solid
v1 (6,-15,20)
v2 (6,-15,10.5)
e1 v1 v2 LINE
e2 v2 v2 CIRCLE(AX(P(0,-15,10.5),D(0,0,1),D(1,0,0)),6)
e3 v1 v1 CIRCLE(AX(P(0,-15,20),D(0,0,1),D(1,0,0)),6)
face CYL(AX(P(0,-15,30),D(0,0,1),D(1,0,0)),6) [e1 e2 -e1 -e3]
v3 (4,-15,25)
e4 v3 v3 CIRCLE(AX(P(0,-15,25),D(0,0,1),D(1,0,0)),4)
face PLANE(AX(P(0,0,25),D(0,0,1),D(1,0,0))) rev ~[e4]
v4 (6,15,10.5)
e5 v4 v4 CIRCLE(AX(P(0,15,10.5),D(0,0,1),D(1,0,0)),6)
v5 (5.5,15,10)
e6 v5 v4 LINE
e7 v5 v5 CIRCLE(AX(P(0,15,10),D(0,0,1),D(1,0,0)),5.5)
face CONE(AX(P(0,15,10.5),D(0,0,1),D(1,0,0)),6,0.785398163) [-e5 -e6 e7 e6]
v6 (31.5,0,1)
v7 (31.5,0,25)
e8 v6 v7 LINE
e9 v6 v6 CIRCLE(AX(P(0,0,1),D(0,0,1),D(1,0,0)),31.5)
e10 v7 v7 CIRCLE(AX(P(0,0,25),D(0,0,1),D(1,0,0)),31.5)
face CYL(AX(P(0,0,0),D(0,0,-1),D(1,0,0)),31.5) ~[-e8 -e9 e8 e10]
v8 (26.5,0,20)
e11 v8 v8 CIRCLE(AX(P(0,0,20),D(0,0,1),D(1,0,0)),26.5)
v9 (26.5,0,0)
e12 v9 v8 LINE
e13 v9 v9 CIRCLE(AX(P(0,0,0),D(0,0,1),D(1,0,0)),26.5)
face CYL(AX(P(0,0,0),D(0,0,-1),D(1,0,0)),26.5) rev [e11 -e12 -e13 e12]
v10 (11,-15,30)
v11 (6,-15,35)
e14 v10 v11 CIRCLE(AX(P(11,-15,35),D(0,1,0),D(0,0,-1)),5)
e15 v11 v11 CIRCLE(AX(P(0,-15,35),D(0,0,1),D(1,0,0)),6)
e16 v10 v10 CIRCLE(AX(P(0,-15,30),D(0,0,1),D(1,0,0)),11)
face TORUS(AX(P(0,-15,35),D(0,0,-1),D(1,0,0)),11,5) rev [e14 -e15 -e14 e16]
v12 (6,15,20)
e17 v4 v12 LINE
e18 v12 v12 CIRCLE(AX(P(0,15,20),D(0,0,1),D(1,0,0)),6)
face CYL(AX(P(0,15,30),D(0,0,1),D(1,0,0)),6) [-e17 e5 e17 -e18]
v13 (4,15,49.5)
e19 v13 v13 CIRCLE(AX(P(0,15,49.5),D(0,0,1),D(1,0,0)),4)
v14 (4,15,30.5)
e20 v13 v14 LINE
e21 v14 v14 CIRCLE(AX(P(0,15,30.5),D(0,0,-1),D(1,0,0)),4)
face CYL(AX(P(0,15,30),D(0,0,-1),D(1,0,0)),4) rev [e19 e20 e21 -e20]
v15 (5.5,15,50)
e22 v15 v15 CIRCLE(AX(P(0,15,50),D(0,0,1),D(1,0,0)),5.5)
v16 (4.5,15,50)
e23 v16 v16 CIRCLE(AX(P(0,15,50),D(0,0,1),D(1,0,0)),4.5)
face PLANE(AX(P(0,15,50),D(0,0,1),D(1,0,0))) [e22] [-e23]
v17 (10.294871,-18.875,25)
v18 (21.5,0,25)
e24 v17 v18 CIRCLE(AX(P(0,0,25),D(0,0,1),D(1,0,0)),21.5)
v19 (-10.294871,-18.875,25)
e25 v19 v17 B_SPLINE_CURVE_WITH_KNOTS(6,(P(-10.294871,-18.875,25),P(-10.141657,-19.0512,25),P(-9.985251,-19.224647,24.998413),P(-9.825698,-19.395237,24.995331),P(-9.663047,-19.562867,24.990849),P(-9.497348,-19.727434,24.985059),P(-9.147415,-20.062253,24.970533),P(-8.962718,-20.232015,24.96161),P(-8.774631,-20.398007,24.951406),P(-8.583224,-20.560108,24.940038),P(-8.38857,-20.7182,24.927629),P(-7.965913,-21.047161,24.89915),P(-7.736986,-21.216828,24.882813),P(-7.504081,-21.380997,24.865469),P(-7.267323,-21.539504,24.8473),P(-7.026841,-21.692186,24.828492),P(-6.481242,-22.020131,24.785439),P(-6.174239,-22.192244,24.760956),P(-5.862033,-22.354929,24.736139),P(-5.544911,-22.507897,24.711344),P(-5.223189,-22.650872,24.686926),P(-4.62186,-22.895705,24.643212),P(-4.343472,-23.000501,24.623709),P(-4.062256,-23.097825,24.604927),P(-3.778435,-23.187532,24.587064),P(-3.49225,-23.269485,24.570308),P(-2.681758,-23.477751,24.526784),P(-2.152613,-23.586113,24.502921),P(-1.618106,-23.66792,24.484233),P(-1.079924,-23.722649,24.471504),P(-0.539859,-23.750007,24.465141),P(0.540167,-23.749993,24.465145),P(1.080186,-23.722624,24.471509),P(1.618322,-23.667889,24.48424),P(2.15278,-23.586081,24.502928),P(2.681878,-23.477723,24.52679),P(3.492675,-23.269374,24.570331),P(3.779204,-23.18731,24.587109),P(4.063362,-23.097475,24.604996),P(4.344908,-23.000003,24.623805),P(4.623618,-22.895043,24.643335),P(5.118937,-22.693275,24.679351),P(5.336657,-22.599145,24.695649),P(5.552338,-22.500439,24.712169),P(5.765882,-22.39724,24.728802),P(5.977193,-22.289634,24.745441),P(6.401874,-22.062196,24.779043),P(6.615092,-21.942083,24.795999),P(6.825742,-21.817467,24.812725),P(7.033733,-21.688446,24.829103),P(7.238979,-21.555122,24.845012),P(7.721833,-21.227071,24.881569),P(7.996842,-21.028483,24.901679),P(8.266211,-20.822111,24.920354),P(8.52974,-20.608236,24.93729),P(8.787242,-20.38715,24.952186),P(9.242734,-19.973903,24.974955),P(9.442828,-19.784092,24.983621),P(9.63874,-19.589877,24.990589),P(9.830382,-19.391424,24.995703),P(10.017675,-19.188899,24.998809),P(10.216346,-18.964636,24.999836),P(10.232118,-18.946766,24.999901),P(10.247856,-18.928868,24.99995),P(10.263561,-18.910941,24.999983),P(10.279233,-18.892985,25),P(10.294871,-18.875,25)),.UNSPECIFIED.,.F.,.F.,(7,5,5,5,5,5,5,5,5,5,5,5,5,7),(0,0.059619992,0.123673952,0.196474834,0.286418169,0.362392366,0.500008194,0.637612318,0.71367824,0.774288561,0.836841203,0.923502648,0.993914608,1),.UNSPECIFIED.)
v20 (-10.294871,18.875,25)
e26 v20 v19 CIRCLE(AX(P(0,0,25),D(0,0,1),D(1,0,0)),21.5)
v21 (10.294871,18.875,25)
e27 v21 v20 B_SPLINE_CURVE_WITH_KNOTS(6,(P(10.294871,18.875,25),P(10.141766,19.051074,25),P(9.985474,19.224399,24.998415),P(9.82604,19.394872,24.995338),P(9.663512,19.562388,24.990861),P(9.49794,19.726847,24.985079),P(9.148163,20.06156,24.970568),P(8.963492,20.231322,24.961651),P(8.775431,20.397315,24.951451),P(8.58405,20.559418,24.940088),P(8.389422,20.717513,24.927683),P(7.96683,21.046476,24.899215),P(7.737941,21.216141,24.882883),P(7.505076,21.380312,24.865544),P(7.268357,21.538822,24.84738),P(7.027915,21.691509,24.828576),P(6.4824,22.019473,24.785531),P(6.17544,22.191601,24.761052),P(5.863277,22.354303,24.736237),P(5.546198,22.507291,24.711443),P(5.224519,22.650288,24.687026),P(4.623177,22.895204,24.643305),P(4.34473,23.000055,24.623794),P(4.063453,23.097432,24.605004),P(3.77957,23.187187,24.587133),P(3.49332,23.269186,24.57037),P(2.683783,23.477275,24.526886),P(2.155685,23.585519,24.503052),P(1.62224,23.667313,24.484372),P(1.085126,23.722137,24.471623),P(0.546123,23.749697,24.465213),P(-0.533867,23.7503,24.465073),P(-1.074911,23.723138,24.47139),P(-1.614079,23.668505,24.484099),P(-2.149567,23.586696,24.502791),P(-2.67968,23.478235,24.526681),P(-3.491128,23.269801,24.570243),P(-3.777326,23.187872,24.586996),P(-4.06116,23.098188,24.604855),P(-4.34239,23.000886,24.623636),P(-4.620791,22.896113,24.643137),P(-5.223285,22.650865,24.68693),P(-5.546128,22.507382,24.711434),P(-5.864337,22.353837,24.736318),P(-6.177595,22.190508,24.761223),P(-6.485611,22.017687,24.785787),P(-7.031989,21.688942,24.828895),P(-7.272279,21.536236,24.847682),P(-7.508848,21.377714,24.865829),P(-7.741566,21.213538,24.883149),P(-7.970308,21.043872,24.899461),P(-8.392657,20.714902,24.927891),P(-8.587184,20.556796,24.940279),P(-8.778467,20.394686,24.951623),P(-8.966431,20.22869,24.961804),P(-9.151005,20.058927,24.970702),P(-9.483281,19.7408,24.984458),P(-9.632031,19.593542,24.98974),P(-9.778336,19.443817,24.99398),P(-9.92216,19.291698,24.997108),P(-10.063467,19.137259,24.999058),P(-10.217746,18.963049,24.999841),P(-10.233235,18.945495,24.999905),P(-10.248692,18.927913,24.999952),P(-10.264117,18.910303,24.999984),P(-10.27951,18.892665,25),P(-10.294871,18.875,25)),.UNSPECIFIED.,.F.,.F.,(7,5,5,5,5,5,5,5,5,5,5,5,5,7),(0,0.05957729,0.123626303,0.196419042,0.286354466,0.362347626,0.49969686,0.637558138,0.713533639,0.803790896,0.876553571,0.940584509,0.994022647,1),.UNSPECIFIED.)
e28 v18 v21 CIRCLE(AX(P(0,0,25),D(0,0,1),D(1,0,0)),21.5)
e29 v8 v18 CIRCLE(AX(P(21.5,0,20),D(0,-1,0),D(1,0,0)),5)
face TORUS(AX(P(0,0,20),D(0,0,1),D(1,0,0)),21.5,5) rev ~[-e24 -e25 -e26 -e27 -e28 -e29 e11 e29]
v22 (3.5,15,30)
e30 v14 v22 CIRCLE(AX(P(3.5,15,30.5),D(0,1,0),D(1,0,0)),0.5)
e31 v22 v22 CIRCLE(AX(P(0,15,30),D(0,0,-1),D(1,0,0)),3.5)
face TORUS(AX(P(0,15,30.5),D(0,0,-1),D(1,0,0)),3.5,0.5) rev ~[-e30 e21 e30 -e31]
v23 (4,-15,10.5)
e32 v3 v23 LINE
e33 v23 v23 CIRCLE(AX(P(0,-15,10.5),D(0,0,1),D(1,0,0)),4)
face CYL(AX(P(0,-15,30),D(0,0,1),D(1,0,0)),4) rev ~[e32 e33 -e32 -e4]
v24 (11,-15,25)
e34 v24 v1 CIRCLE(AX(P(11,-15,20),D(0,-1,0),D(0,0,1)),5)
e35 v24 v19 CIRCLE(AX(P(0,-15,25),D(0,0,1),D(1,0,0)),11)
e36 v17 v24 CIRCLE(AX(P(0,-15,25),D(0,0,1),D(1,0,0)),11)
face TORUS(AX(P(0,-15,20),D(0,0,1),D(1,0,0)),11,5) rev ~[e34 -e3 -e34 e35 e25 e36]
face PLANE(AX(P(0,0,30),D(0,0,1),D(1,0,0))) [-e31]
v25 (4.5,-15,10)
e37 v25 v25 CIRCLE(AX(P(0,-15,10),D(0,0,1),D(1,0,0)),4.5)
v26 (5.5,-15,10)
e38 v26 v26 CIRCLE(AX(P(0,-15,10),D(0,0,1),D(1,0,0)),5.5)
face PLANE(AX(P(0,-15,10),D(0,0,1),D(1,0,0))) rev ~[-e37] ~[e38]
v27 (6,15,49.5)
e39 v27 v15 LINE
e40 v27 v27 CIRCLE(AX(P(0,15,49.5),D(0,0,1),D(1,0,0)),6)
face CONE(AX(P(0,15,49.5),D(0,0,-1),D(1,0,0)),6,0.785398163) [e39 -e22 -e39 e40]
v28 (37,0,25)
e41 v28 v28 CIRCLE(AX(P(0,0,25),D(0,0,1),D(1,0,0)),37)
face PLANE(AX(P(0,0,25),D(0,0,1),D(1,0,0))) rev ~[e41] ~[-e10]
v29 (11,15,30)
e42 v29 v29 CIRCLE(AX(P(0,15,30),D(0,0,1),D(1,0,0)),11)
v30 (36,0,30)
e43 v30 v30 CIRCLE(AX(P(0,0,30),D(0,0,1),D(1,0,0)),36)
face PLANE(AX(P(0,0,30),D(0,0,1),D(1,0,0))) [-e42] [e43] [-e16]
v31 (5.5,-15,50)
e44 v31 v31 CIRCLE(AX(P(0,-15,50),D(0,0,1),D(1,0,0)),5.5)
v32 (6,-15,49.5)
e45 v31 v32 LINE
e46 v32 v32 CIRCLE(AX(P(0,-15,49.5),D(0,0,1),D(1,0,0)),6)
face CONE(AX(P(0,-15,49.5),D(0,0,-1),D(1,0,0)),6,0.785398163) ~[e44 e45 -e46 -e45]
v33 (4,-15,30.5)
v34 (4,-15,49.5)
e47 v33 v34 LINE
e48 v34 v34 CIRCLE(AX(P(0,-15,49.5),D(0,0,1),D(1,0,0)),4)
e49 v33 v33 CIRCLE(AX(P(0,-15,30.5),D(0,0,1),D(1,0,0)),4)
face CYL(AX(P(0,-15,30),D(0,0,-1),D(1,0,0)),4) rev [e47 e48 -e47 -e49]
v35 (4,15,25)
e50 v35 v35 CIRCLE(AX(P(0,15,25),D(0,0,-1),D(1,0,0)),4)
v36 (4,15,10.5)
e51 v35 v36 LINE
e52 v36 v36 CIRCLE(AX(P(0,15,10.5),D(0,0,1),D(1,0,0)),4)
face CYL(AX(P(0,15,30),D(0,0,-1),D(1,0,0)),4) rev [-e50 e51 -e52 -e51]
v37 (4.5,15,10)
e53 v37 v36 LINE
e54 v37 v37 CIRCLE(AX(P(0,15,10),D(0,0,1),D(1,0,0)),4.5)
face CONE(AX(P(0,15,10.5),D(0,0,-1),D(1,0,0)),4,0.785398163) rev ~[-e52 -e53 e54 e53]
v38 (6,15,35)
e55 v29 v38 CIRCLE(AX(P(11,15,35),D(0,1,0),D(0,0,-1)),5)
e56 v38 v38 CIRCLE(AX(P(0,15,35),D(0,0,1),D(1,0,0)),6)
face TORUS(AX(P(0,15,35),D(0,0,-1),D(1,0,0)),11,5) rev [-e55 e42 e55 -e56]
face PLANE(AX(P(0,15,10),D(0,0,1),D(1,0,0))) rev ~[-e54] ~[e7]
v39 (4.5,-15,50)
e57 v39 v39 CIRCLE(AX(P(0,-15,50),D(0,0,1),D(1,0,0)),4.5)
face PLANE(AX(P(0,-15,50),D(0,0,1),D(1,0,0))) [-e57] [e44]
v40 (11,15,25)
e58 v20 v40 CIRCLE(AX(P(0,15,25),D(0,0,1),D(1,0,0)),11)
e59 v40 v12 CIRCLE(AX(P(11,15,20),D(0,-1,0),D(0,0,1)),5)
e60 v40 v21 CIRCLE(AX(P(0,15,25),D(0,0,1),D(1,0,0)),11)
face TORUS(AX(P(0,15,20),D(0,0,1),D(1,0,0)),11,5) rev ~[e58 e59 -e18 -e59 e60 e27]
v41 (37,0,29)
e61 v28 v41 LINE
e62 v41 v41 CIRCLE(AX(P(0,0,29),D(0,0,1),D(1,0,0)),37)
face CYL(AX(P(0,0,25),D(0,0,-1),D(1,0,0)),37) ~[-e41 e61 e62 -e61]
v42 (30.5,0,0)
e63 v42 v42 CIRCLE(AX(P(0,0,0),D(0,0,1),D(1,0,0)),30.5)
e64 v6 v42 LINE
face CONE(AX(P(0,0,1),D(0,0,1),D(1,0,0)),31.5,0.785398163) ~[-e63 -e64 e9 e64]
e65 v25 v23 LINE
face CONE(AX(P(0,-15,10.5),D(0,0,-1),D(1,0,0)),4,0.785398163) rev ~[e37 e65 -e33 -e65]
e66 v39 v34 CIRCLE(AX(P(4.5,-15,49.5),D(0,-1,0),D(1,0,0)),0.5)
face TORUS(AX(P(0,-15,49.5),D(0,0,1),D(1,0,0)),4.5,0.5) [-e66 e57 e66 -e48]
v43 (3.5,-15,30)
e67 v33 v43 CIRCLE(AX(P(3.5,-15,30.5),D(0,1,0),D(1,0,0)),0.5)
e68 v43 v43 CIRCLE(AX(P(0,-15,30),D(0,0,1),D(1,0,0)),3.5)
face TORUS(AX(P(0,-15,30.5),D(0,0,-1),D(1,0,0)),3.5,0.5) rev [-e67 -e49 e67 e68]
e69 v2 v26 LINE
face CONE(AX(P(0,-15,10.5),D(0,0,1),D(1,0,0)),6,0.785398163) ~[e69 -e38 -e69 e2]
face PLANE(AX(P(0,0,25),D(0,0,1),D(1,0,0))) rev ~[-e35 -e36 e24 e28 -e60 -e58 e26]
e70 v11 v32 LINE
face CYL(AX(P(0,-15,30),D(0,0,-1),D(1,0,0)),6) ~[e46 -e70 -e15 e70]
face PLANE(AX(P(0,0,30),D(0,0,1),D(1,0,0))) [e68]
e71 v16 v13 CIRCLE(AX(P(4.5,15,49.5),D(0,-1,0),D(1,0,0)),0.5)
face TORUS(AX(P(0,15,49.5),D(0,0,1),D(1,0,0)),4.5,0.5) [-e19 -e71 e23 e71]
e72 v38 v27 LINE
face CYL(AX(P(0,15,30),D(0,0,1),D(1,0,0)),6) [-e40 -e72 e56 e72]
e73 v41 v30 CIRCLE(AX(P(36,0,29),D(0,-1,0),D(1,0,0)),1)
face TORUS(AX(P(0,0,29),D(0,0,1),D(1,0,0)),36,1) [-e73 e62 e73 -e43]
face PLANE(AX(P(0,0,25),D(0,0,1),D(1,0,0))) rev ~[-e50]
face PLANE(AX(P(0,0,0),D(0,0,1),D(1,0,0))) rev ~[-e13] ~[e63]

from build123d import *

# Parameters (mm, degrees)
F0_R     = 31.5
F0_R_2   = 26.5
F1_DEPTH = 25
F2_R     = 37
F2_R_2   = 31.5
F2_R_3   = 26.5
F3_DEPTH = 5
F4_R     = 6
F4_R_2   = 4
F5_DEPTH = 20
F7_R     = 1
F8_SIZE  = 1
F9_R     = 0.5
F10_SIZE = 0.5
F11_SIZE = 0.5
F12_SIZE = 0.5


# Not quite as in the source:
# - a fillet or chamfer that OpenCascade refuses, or shapes differently, is made with other operations: its cross-section is extruded or revolved along the edge and cut away or added


with BuildPart() as f1:
    # F0 (on Top) → F1 (new body)
    with BuildSketch(Plane.XY):
        Circle(F0_R)
        Circle(F0_R_2, mode=Mode.SUBTRACT)
    extrude(amount=F1_DEPTH)

    # F2 (on face) → F3 (join)
    with BuildSketch(Plane.XY.offset(25)):
        Circle(F2_R)
        Circle(F2_R_2, mode=Mode.SUBTRACT)
        Circle(F2_R_2)
        Circle(F2_R_3, mode=Mode.SUBTRACT)
        Circle(F2_R_3)
    extrude(amount=F3_DEPTH)

    # F4 (on face) → F5 (join, symmetric)
    with BuildSketch(Plane.XY.offset(30)):
        with Locations((0, -15)):
            Circle(F4_R)
        with Locations((0, -15)):
            Circle(F4_R_2, mode=Mode.SUBTRACT)
        with Locations((0, 15)):
            Circle(F4_R)
        with Locations((0, 15)):
            Circle(F4_R_2, mode=Mode.SUBTRACT)
    extrude(amount=F5_DEPTH, both=True)

    # F6: fillet of radius 5 on 5 edges, made by hand

    # F6_s1 → F6_t2 (revolve)
    with BuildSketch(Plane.XZ.offset(-15)):
        with BuildLine():
            ThreePointArc((11, 30), (7.4644660941, 31.4644660941), (6, 35))
            Line((6, 35), (6, 30))
            Line((6, 30), (11, 30))
        make_face()
    revolve(axis=Axis((0, 15, 30), (0, 0, 1)))

    # F6_s3 → F6_t4 (revolve)
    with BuildSketch(Plane.XZ.offset(15)):
        with BuildLine():
            ThreePointArc((11, 30), (7.4644660941, 31.4644660941), (6, 35))
            Line((6, 35), (6, 30))
            Line((6, 30), (11, 30))
        make_face()
    revolve(axis=Axis((0, -15, 30), (0, 0, 1)))

    # F6_s5 → F6_t6 (revolve)
    with BuildSketch(Plane.XZ):
        with BuildLine():
            ThreePointArc((26.5, 20), (25.0355339059, 23.5355339059), (21.5, 25))
            Line((21.5, 25), (26.5, 25))
            Line((26.5, 25), (26.5, 20))
        make_face()
    revolve(axis=Axis((0, 0, 25), (0, 0, 1)))

    # F6_s7 → F6_t8 (revolve)
    with BuildSketch(Plane.XZ.offset(15)):
        with BuildLine():
            ThreePointArc((11, 25), (7.4644660941, 23.5355339059), (6, 20))
            Line((6, 20), (6, 25))
            Line((6, 25), (11, 25))
        make_face()
    revolve(axis=Axis((0, -15, 25), (0, 0, 1)))

    # F6_s9 → F6_t10 (revolve)
    with BuildSketch(Plane.XZ.offset(-15)):
        with BuildLine():
            ThreePointArc((11, 25), (7.4644660941, 23.5355339059), (6, 20))
            Line((6, 20), (6, 25))
            Line((6, 25), (11, 25))
        make_face()
    revolve(axis=Axis((0, 15, 25), (0, 0, 1)))

    # F7
    f7_edges = [f1.edges().sort_by_distance(p)[0] for p in [
        (-37, 0, 30),
    ]]
    fillet(f7_edges, radius=F7_R)

    # F8
    f8_edges = [f1.edges().sort_by_distance(p)[0] for p in [
        (-31.5, 0, 0),
    ]]
    chamfer(f8_edges, length=F8_SIZE)

    # F9
    f9_edges = [f1.edges().sort_by_distance(p)[0] for p in [
        (4, 15, 40),
        (-4, 15, 30),
        (-4, 15, 50),
        (4, -15, 40),
        (-4, -15, 30),
        (-4, -15, 50),
    ]]
    fillet(f9_edges, radius=F9_R)

    # F10
    f10_edges = [f1.edges().sort_by_distance(p)[0] for p in [
        (-6, -15, 50),
        (-6, 15, 50),
    ]]
    chamfer(f10_edges, length=F10_SIZE)

    # F11
    f11_edges = [f1.edges().sort_by_distance(p)[0] for p in [
        (-4, 15, 10),
        (-4, -15, 10),
    ]]
    chamfer(f11_edges, length=F11_SIZE)

    # F12
    f12_edges = [f1.edges().sort_by_distance(p)[0] for p in [
        (-6, 15, 10),
        (-6, -15, 10),
    ]]
    chamfer(f12_edges, length=F12_SIZE)


solid = f1.part
